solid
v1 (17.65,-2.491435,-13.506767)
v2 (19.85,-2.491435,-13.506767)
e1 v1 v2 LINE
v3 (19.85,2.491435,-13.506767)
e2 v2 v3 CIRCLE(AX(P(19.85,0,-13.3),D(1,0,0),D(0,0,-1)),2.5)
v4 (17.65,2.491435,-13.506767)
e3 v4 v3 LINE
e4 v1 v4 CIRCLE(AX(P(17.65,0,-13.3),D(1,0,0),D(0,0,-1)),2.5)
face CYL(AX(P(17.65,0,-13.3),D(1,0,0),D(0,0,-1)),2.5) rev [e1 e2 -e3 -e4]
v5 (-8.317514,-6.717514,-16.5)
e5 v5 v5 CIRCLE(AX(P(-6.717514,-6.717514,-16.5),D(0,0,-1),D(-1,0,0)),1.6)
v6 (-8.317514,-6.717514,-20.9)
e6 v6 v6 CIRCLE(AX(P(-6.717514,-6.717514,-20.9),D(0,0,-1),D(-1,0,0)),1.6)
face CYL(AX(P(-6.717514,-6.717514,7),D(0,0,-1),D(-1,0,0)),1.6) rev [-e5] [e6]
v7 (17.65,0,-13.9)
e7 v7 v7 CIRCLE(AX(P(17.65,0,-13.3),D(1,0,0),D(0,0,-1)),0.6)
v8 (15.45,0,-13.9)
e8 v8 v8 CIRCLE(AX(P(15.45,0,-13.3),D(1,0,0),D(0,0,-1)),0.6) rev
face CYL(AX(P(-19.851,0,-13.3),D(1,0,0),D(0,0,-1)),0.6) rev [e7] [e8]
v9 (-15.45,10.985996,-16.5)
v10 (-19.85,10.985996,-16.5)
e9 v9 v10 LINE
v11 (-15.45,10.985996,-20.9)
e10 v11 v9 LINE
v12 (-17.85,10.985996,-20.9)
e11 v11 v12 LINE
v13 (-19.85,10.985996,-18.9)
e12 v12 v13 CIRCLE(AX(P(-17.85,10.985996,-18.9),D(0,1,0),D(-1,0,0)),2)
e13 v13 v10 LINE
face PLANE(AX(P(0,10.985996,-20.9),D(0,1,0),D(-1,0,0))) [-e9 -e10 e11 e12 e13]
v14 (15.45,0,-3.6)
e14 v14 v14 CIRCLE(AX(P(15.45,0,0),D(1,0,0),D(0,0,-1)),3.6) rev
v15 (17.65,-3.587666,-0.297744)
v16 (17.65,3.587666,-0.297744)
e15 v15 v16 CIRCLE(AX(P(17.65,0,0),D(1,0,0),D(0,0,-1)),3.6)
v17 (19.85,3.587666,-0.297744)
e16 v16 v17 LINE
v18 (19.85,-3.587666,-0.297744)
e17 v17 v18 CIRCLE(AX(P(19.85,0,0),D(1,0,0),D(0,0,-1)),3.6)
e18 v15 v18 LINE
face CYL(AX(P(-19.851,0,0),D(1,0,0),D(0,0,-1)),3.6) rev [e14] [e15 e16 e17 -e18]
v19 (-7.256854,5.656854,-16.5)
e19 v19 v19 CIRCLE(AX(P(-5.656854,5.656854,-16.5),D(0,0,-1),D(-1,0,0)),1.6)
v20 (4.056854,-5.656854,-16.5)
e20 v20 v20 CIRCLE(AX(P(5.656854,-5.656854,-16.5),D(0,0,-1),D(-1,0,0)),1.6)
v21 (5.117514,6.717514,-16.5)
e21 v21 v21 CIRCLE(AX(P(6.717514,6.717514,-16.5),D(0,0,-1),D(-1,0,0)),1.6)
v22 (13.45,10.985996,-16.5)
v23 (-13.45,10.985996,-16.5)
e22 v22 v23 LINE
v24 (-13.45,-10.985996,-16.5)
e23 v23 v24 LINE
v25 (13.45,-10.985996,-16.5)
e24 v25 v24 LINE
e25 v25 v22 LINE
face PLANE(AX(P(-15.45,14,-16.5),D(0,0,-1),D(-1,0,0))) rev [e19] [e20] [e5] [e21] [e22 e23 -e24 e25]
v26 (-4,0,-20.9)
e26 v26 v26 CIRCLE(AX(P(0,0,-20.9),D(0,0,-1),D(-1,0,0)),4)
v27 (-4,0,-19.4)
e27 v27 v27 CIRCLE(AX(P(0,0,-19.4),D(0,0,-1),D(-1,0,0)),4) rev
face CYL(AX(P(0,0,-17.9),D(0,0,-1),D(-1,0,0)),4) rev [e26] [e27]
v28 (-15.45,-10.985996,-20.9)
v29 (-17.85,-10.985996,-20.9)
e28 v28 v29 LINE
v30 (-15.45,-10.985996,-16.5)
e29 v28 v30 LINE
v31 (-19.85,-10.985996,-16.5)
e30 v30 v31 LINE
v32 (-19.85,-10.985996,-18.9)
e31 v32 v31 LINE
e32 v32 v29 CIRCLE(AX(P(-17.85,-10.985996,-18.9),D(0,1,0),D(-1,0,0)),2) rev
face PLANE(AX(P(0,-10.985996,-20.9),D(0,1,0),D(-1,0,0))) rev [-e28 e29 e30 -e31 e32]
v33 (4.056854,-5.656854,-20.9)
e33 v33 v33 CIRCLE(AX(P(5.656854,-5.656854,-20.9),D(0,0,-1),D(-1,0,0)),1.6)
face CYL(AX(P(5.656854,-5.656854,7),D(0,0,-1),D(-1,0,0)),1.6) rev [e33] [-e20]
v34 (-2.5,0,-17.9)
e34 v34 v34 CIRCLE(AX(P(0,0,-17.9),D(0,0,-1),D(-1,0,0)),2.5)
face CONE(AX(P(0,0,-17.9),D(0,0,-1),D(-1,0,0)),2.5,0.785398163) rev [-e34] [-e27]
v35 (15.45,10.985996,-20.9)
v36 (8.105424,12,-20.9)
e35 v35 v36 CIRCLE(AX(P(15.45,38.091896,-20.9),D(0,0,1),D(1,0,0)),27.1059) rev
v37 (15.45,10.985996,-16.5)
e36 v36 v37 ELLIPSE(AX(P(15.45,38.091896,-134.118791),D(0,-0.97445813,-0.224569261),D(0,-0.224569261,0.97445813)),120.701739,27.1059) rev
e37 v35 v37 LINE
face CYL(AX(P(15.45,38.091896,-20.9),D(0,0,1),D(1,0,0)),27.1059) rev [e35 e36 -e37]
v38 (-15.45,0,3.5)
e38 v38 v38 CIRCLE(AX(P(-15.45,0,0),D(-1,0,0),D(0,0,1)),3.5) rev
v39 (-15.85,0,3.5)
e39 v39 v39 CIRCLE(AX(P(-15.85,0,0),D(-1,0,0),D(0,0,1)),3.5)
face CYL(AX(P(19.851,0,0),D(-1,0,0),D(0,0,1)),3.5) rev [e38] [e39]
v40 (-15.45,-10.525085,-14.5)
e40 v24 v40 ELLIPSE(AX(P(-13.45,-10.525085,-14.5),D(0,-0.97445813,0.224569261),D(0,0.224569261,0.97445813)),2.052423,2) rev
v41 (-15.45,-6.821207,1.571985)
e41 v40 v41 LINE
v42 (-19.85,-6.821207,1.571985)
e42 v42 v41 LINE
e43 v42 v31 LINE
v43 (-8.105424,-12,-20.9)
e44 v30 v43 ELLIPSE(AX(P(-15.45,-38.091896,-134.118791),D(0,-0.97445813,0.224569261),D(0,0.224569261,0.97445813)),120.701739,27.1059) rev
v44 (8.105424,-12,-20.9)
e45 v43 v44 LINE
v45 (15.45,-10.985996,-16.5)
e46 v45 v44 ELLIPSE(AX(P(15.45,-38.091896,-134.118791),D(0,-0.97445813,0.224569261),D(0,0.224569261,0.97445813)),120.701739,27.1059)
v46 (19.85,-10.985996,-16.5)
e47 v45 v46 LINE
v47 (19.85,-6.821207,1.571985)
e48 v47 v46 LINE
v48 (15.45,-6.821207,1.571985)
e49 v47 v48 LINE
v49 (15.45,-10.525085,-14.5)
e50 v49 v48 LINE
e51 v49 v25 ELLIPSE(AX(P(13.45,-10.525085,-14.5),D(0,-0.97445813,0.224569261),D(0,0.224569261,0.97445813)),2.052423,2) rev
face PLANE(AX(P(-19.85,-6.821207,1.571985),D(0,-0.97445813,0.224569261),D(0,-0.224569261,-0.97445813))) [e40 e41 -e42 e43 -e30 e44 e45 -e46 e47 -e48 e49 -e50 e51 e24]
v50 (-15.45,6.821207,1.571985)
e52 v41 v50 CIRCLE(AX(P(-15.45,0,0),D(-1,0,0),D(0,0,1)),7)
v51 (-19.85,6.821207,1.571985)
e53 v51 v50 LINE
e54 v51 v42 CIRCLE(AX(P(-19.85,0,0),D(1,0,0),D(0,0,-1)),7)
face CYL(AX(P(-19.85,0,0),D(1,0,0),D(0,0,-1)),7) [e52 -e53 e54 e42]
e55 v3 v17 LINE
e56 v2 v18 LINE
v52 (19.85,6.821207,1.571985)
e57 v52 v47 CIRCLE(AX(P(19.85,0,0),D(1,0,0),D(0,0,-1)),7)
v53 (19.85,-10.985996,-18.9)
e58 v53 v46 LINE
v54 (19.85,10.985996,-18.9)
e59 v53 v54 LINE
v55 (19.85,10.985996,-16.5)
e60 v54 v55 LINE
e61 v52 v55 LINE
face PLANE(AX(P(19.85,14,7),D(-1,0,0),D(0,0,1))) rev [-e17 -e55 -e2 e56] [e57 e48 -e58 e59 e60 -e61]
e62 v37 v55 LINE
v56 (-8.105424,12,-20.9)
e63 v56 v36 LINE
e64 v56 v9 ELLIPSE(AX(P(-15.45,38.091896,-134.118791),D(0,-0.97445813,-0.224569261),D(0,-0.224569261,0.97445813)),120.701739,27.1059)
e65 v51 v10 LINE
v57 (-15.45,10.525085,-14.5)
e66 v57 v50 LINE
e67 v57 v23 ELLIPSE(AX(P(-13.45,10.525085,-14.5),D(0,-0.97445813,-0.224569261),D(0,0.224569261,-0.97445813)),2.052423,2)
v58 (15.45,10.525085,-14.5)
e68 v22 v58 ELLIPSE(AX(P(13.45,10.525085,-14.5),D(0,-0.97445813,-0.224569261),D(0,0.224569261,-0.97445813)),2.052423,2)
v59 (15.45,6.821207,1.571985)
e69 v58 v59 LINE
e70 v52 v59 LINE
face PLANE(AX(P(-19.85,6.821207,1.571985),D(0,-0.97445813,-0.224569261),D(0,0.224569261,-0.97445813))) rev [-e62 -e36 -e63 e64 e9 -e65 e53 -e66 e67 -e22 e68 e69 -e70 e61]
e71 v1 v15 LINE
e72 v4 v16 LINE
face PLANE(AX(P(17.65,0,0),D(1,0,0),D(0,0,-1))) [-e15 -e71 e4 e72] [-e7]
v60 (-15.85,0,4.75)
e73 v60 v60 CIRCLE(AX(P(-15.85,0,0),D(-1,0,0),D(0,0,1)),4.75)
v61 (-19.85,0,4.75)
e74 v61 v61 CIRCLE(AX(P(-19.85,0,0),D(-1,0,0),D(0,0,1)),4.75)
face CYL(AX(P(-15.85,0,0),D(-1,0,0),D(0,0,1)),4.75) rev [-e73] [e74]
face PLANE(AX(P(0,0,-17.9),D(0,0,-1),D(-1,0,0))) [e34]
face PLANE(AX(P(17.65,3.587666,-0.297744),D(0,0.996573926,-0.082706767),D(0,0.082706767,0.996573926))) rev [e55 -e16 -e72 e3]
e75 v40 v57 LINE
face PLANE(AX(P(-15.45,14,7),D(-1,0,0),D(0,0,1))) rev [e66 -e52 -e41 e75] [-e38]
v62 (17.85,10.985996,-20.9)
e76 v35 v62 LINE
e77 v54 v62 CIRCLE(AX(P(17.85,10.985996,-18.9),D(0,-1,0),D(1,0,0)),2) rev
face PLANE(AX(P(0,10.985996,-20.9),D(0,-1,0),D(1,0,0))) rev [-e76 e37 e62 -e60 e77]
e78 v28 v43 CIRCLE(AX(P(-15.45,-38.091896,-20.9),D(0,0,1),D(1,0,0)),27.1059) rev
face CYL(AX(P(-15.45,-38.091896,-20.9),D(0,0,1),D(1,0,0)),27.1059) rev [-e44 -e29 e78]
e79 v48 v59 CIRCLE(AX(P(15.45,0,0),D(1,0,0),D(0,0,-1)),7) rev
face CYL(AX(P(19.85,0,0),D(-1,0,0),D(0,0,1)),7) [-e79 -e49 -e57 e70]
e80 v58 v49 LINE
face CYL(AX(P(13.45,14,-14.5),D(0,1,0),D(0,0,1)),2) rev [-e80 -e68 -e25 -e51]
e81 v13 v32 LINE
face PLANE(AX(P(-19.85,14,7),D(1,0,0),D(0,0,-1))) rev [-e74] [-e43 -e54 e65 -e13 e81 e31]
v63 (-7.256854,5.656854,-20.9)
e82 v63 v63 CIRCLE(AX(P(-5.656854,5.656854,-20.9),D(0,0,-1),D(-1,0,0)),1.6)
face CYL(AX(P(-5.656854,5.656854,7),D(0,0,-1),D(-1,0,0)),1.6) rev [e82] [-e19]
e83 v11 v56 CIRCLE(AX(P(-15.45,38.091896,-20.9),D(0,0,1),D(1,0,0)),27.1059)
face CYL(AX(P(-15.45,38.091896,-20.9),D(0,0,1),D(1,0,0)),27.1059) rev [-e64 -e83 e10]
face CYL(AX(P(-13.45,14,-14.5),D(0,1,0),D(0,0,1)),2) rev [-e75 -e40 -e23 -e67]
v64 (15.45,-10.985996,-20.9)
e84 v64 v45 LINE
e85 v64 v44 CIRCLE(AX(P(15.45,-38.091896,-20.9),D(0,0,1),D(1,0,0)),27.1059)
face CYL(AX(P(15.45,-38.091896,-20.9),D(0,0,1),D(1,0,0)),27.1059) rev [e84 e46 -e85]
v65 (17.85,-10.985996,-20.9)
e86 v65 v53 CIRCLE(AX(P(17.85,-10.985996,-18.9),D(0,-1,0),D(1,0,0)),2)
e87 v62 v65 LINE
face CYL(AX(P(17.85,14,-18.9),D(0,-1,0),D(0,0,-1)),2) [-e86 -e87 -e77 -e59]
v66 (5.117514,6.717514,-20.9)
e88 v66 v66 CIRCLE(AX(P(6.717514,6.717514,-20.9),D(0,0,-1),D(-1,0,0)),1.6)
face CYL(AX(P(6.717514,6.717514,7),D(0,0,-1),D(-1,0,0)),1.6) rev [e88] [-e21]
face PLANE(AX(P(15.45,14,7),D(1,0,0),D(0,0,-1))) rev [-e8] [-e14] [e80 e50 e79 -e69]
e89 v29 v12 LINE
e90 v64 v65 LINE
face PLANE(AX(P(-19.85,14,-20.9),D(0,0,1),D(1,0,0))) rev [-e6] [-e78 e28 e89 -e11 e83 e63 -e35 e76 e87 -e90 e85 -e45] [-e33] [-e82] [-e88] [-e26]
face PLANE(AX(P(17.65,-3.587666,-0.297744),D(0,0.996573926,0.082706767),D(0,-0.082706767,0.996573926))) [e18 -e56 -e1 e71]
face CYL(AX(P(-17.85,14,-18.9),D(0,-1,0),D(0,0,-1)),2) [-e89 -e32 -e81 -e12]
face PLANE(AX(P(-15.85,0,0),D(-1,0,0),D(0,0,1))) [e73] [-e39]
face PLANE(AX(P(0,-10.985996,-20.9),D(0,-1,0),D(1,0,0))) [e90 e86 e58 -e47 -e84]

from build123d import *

# Parameters (mm, degrees)
Y_KSEKLIK_EKSTR_ZYON1_DEPTH = 14
KES_EKSTR_ZYON1_DEPTH       = 33.044227249
KES_EKSTR_ZYON3_DEPTH       = 33.044227249
KES_EKSTR_ZYON4_START       = -4.4
KES_EKSTR_ZYON4_DEPTH       = 4.4
KES_EKSTR_ZYON6_REACH       = 48.442
IZIM6_R                     = 3.6
IZIM5_R                     = 1.6
KES_EKSTR_ZYON5_DEPTH       = 37.282674929
KES_EKSTR_ZYON7_DEPTH       = 2.2
KES_EKSTR_ZYON8_REACH       = 46.576
IZIM7_R                     = 0.6
KES_EKSTR_ZYON10_REACH      = 48.442
IZIM9_R                     = 3.5
IZIM9_3_R                   = 4.75
IZIM9_3_R_2                 = 3.5
KES_EKSTR_ZYON11_DEPTH      = 4
RADYUS1_R                   = 2
IZIM5_3_R                   = 4
KES_EKSTR_ZYON12_DEPTH      = 3
PAH1_SIZE                   = 1.5


# Read off the part's stored shape, not the designer's step: Kes-Ekstrüzyon4
with BuildPart() as part:
    # Çizim1 → Yükseklik-Ekstrüzyon1 (new, symmetric)
    with BuildSketch(Plane(origin=(0, 0, 0), x_dir=(1, 0, 0), z_dir=(0, 1, 0))):
        Polygon((-19.85, -7), (-19.85, 20.9), (19.85, 20.9), (19.85, -7), (15.45, -7), (15.45, 16.5), (-15.45, 16.5), (-15.45, -7), align=None)
    extrude(amount=Y_KSEKLIK_EKSTR_ZYON1_DEPTH, both=True)

    # Çizim2 → Kes-Ekstrüzyon1 (cut, through all)
    with BuildSketch(Plane(origin=(0, 0, 0), x_dir=(0, 0, -1), z_dir=(1, 0, 0))):
        with BuildLine():
            Line((20.9, -12), (-1.571984828, -6.821206909))
            ThreePointArc((-1.571984828, -6.821206909), (-5.477403299, -4.358675613), (-7, 0))
            Line((-7, 0), (-7, -14))
            Line((-7, -14), (20.9, -14))
            Line((20.9, -14), (20.9, -12))
        make_face()
        with BuildLine():
            Line((-7, 14), (-7, 0))
            ThreePointArc((-7, 0), (-5.477403299, 4.358675613), (-1.571984828, 6.821206909))
            Line((-1.571984828, 6.821206909), (20.9, 12))
            Line((20.9, 12), (20.9, 14))
            Line((20.9, 14), (-7, 14))
        make_face()
    extrude(amount=-KES_EKSTR_ZYON1_DEPTH, mode=Mode.SUBTRACT)

    # Çizim3 → Kes-Ekstrüzyon3 (cut, through all)
    with BuildSketch(Plane(origin=(0, 0, 0), x_dir=(0, 0, -1), z_dir=(1, 0, 0))):
        with BuildLine():
            ThreePointArc((-7, 3e-09), (-5.477403298, 4.358675614), (-1.571984828, 6.821206909))
            Line((-1.571984828, 6.821206909), (20.9, 12))
            Line((20.9, 12), (20.9, 14))
            Line((20.9, 14), (-7, 14))
            Line((-7, 14), (-7, 3e-09))
        make_face()
        with BuildLine():
            ThreePointArc((-1.571984828, -6.821206909), (-5.4774033, -4.358675612), (-7, 3e-09))
            Line((-7, 3e-09), (-7, -14))
            Line((-7, -14), (20.9, -14))
            Line((20.9, -14), (20.9, -12))
            Line((20.9, -12), (-1.571984828, -6.821206909))
        make_face()
    extrude(amount=KES_EKSTR_ZYON3_DEPTH, mode=Mode.SUBTRACT)

    # Kes-Ekstrüzyon4 outline → Kes-Ekstrüzyon4 (cut)
    with BuildSketch(Plane.XY.offset(-16.5).offset(KES_EKSTR_ZYON4_START)):
        with BuildLine():
            Line((-19.85, 10.985995684), (-15.45, 10.985995684))
            ThreePointArc((-15.45, 10.985995684), (-10.259984059, 11.487506015), (-5.262018305, 12.973479231))
            ThreePointArc((-5.262018305, 12.973479231), (-2.680605384, 13.740973574), (5.9e-08, 14))
            Line((5.9e-08, 14), (-19.85, 14))
            Line((-19.85, 14), (-19.85, 10.985995684))
        make_face()
        with BuildLine():
            ThreePointArc((-5.262018305, -12.973479231), (-10.259984059, -11.487506015), (-15.45, -10.985995684))
            Line((-15.45, -10.985995684), (-19.85, -10.985995684))
            Line((-19.85, -10.985995684), (-19.85, -14))
            Line((-19.85, -14), (0, -14))
            ThreePointArc((0, -14), (-2.680605414, -13.740973569), (-5.262018305, -12.973479231))
        make_face()
        with BuildLine():
            Line((19.85, 14), (5.9e-08, 14))
            ThreePointArc((5.9e-08, 14), (2.680605443, 13.740973563), (5.262018305, 12.973479231))
            ThreePointArc((5.262018305, 12.973479231), (10.259984059, 11.487506015), (15.45, 10.985995684))
            Line((15.45, 10.985995684), (19.85, 10.985995684))
            Line((19.85, 10.985995684), (19.85, 14))
        make_face()
        with BuildLine():
            ThreePointArc((5.262018305, -12.973479231), (2.680605414, -13.740973569), (0, -14))
            Line((0, -14), (19.85, -14))
            Line((19.85, -14), (19.85, -10.985995684))
            Line((19.85, -10.985995684), (15.45, -10.985995684))
            ThreePointArc((15.45, -10.985995684), (10.259984059, -11.487506015), (5.262018305, -12.973479231))
        make_face()
    extrude(amount=KES_EKSTR_ZYON4_DEPTH, mode=Mode.SUBTRACT)

    # Çizim6 → Kes-Ekstrüzyon6 (cut, up to next)
    with BuildSketch(Plane(origin=(19.85, 0, 0), x_dir=(0, 0, -1), z_dir=(1, 0, 0)), mode=Mode.PRIVATE) as kes_ekstr_zyon6_sk1:
        Circle(IZIM6_R)
    kes_ekstr_zyon6_tool1 = extrude(kes_ekstr_zyon6_sk1.sketch, amount=-KES_EKSTR_ZYON6_REACH, mode=Mode.PRIVATE) & part.part
    add(kes_ekstr_zyon6_tool1.solids().sort_by_distance((19.85, 0, 0))[0], mode=Mode.SUBTRACT)

    # Çizim5 → Kes-Ekstrüzyon5 (cut, through all)
    with BuildSketch(Plane(origin=(0, 0, -20.9), x_dir=(-1, 0, 0), z_dir=(0, 0, -1))):
        with Locations((-5.656854249, -5.656854249)):
            Circle(IZIM5_R)
        with Locations((-6.717514421, 6.717514421)):
            Circle(IZIM5_R)
        with Locations((5.656854249, 5.656854249)):
            Circle(IZIM5_R)
        with Locations((6.717514421, -6.717514421)):
            Circle(IZIM5_R)
    extrude(amount=-KES_EKSTR_ZYON5_DEPTH, mode=Mode.SUBTRACT)

    # Çizim6<3> → Kes-Ekstrüzyon7 (cut)
    with BuildSketch(Plane(origin=(19.85, 0, 0), x_dir=(0, 0, -1), z_dir=(1, 0, 0))):
        with BuildLine():
            ThreePointArc((0.297744361, 3.587666135), (3.6, 0), (0.297744361, -3.587666135))
            Line((0.297744361, -3.587666135), (13.506766917, -2.491434816))
            ThreePointArc((13.506766917, -2.491434816), (15.8, 0), (13.506766917, 2.491434816))
            Line((13.506766917, 2.491434816), (0.297744361, 3.587666135))
        make_face()
    extrude(amount=-KES_EKSTR_ZYON7_DEPTH, mode=Mode.SUBTRACT)

    # Çizim7 → Kes-Ekstrüzyon8 (cut, up to next)
    with BuildSketch(Plane(origin=(17.65, 0, 0), x_dir=(0, 0, -1), z_dir=(1, 0, 0)), mode=Mode.PRIVATE) as kes_ekstr_zyon8_sk1:
        with Locations((13.3, 0)):
            Circle(IZIM7_R)
    kes_ekstr_zyon8_tool1 = extrude(kes_ekstr_zyon8_sk1.sketch, amount=-KES_EKSTR_ZYON8_REACH, mode=Mode.PRIVATE) & part.part
    add(kes_ekstr_zyon8_tool1.solids().sort_by_distance((17.65, 0, -13.3))[0], mode=Mode.SUBTRACT)

    # Çizim9 → Kes-Ekstrüzyon10 (cut, up to next)
    with BuildSketch(Plane.ZY.offset(19.85), mode=Mode.PRIVATE) as kes_ekstr_zyon10_sk1:
        Circle(IZIM9_R)
    kes_ekstr_zyon10_tool1 = extrude(kes_ekstr_zyon10_sk1.sketch, amount=-KES_EKSTR_ZYON10_REACH, mode=Mode.PRIVATE) & part.part
    add(kes_ekstr_zyon10_tool1.solids().sort_by_distance((-19.85, 0, 0))[0], mode=Mode.SUBTRACT)

    # Çizim9<3> → Kes-Ekstrüzyon11 (cut)
    with BuildSketch(Plane.ZY.offset(19.85)):
        Circle(IZIM9_3_R)
        Circle(IZIM9_3_R_2, mode=Mode.SUBTRACT)
    extrude(amount=-KES_EKSTR_ZYON11_DEPTH, mode=Mode.SUBTRACT)

    # Radyus1
    # the kernel refuses this fillet: 2 mm, written as the material it adds along each edge
    with BuildSketch(Plane(origin=(-15.45, -15.985995684, -16.5), x_dir=(0, 0, 1), z_dir=(0, 1, 0))) as radyus1_piece_1_section:
        with BuildLine():
            CenterArc((RADYUS1_R, RADYUS1_R), RADYUS1_R, 180, 90)
            Line((0, RADYUS1_R), (0, 0))
            Line((0, 0), (RADYUS1_R, 0))
        make_face()
    radyus1_piece_1 = extrude(amount=31.971991369, mode=Mode.PRIVATE)
    radyus1_piece_1 = split(radyus1_piece_1, bisect_by=Plane(origin=(-14.994883818, 10.333733048, -13.66968108), z_dir=(0, -0.9744581299008602, -0.22456926118709647)), keep=Keep.TOP, mode=Mode.PRIVATE)
    radyus1_piece_1 = split(radyus1_piece_1, bisect_by=Plane(origin=(-14.994883818, -10.333733048, -13.66968108), z_dir=(0, 0.9744581299008602, -0.22456926118709647)), keep=Keep.TOP, mode=Mode.PRIVATE)
    add(radyus1_piece_1)
    with BuildSketch(Plane(origin=(15.45, 15.985995684, -16.5), x_dir=(-1, 0, 0), z_dir=(0, -1, 0))) as radyus1_piece_2_section:
        with BuildLine():
            CenterArc((RADYUS1_R, -RADYUS1_R), RADYUS1_R, 90, 90)
            Line((0, -RADYUS1_R), (0, 0))
            Line((0, 0), (RADYUS1_R, 0))
        make_face()
    radyus1_piece_2 = extrude(amount=31.971991369, mode=Mode.PRIVATE)
    radyus1_piece_2 = split(radyus1_piece_2, bisect_by=Plane(origin=(14.994883818, -10.333733048, -13.66968108), z_dir=(0, 0.9744581299008602, -0.22456926118709647)), keep=Keep.TOP, mode=Mode.PRIVATE)
    radyus1_piece_2 = split(radyus1_piece_2, bisect_by=Plane(origin=(14.994883818, 10.333733048, -13.66968108), z_dir=(0, -0.9744581299008602, -0.22456926118709647)), keep=Keep.TOP, mode=Mode.PRIVATE)
    add(radyus1_piece_2)
    # the kernel refuses this fillet: 2 mm, written as the material it takes off along each edge
    with BuildSketch(Plane(origin=(-19.85, 15.985995684, -20.9), x_dir=(0, 0, 1), z_dir=(0, -1, 0)), Plane(origin=(19.85, 15.985995684, -20.9), x_dir=(-1, 0, 0), z_dir=(0, -1, 0))) as radyus1_2_piece_1:
        with BuildLine():
            CenterArc((RADYUS1_R, -RADYUS1_R), RADYUS1_R, 90, 90)
            Line((0, -RADYUS1_R), (0, 0))
            Line((0, 0), (RADYUS1_R, 0))
        make_face()
    extrude(amount=31.971991368, mode=Mode.SUBTRACT)

    # Çizim5<3> → Kes-Ekstrüzyon12 (cut)
    with BuildSketch(Plane(origin=(0, 0, -20.9), x_dir=(-1, 0, 0), z_dir=(0, 0, -1))):
        Circle(IZIM5_3_R)
    extrude(amount=-KES_EKSTR_ZYON12_DEPTH, mode=Mode.SUBTRACT)

    # Pah1
    pah1_edges = [part.edges().sort_by_distance(p)[0] for p in [
        (4, 0, -17.9),
    ]]
    chamfer(pah1_edges, length=PAH1_SIZE)


solid = part.part
